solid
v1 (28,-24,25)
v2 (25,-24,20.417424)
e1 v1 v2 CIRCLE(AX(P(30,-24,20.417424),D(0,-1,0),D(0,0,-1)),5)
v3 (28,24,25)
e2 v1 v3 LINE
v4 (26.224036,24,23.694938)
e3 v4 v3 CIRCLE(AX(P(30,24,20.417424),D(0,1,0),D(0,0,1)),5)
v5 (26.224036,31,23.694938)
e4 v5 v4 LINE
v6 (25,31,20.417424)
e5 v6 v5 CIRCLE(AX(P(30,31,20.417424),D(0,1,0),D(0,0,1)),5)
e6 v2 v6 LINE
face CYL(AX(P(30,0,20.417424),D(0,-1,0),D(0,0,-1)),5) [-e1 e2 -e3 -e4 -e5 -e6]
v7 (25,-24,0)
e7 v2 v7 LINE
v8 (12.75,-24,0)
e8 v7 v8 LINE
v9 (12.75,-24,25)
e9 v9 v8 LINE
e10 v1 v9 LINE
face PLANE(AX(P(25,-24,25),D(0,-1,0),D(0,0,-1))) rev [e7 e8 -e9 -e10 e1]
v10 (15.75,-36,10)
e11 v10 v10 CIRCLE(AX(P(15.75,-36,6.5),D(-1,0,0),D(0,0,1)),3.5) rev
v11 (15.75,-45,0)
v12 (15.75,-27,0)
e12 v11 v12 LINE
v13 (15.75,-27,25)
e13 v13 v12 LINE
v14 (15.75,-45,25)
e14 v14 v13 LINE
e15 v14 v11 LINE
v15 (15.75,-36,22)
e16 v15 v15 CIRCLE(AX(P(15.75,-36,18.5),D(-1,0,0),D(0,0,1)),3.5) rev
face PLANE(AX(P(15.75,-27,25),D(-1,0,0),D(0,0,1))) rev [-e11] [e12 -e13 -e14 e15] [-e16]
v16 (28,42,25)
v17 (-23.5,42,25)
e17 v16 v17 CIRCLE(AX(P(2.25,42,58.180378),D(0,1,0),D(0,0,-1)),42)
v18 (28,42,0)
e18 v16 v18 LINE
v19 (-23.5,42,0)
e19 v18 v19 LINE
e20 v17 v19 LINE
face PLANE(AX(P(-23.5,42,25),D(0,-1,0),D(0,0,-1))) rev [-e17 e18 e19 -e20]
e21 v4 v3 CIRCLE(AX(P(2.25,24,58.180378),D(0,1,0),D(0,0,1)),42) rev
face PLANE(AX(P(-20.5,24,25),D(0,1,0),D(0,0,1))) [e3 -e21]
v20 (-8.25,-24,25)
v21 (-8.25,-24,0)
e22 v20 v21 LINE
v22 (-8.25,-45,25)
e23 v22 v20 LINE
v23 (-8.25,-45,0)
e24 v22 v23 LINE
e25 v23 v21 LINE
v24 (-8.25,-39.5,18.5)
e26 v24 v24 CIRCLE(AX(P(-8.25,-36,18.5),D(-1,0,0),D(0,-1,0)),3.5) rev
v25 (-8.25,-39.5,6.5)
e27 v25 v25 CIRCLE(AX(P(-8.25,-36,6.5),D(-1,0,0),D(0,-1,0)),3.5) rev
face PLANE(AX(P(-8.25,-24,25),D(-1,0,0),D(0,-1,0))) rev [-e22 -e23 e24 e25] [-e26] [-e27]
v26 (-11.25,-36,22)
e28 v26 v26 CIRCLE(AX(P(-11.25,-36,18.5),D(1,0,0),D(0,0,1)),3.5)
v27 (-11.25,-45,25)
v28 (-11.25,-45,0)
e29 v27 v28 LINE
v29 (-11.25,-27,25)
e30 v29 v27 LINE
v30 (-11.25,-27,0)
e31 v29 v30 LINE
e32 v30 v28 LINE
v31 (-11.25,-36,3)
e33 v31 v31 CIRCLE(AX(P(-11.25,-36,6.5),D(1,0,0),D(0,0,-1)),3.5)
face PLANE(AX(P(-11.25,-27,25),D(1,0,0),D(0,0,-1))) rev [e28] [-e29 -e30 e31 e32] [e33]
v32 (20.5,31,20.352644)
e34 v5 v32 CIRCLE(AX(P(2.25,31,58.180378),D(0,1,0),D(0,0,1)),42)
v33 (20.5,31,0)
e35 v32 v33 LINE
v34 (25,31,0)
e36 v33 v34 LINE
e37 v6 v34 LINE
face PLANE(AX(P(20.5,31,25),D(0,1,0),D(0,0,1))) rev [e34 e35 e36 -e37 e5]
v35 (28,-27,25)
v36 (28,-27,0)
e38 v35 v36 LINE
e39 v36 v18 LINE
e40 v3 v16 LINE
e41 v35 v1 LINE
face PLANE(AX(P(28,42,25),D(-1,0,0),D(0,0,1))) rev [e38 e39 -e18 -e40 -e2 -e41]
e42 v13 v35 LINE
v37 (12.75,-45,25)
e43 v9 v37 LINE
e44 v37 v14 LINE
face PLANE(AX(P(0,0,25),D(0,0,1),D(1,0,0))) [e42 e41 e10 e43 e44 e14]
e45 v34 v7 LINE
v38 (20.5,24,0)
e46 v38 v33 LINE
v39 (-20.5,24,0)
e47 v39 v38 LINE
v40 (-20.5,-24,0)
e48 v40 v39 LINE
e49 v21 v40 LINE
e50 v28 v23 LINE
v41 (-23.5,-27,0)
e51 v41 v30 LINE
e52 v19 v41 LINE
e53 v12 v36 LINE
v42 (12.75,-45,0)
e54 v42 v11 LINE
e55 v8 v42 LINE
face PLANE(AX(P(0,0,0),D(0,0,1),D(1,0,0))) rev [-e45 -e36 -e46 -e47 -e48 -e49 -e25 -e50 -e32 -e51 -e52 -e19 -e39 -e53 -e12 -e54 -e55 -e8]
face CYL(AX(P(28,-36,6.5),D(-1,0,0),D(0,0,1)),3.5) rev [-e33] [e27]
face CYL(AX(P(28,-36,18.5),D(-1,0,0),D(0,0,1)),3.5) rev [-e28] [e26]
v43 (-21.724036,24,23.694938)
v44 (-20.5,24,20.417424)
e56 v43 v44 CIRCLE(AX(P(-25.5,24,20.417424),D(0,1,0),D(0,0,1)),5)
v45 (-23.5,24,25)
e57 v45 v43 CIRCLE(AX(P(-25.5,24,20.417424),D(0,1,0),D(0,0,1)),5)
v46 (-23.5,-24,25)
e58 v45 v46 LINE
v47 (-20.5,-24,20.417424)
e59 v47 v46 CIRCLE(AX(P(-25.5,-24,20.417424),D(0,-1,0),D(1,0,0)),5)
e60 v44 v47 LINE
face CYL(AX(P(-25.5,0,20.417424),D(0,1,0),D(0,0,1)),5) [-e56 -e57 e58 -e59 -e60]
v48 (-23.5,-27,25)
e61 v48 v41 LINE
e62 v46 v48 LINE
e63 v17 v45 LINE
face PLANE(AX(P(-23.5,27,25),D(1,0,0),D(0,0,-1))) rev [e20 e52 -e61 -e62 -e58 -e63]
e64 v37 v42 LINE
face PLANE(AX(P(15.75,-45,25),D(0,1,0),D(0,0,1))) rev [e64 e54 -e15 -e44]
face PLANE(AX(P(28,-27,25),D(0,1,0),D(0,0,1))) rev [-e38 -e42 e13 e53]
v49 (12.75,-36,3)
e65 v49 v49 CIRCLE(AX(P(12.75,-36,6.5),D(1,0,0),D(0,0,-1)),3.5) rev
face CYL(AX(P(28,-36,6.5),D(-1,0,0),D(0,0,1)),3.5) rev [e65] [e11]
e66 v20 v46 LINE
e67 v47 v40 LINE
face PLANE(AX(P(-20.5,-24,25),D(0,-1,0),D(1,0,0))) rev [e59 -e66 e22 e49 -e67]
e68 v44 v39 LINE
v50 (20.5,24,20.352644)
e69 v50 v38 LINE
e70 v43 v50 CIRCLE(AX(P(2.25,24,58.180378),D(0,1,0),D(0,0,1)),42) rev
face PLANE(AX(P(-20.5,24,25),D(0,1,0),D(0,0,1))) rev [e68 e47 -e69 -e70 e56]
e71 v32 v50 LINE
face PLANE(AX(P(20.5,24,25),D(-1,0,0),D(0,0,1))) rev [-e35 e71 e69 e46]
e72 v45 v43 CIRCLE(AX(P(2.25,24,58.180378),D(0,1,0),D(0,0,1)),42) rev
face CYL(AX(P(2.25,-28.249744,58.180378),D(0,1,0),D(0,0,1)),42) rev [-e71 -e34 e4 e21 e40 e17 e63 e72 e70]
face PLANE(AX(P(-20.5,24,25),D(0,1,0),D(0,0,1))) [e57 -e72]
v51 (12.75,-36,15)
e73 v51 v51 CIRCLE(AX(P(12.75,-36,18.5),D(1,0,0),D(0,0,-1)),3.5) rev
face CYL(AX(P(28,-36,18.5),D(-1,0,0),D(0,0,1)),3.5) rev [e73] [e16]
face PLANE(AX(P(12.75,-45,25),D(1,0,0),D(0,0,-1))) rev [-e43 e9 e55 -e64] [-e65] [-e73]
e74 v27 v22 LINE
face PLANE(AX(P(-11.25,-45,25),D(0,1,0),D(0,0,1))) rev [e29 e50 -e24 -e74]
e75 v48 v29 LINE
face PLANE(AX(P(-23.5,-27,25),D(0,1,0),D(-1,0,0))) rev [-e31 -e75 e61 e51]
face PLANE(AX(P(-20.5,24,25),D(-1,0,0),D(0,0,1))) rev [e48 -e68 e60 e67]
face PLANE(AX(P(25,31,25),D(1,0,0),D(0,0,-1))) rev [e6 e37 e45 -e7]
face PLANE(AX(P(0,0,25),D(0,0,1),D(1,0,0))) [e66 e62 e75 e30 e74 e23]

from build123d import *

# Parameters (mm, degrees)
BOSS_EXTRUDE1_DEPTH = 25
SKETCH2_R           = 3.5
CUT_EXTRUDE1_DEPTH  = 65.734554142
CUT_EXTRUDE3_REACH  = 96.752
FILLET1_R           = 5


with BuildPart() as part:
    # Sketch1 → Boss-Extrude1 (new body)
    with BuildSketch(Plane.XY):
        Polygon((-20.5, 24), (20.5, 24), (20.5, 31), (25, 31), (25, -24), (12.75, -24), (12.75, -45), (15.75, -45), (15.75, -27), (28, -27), (28, 34), (28, 42), (-23.5, 42), (-23.5, 27), (-23.5, -27), (-11.25, -27), (-11.25, -45), (-8.25, -45), (-8.25, -24), (-20.5, -24), align=None)
    extrude(amount=BOSS_EXTRUDE1_DEPTH)

    # Sketch2 → Cut-Extrude1 (cut, through all)
    with BuildSketch(Plane(origin=(-11.25, 0, 0), x_dir=(0, 0, -1), z_dir=(1, 0, 0))):
        with Locations(Location((-6.5, -36, 0), (0, 0, 270))):
            Circle(SKETCH2_R)
        with Locations(Location((-18.5, -36, 0), (0, 0, 180))):
            Circle(SKETCH2_R)
    extrude(amount=CUT_EXTRUDE1_DEPTH, mode=Mode.SUBTRACT)

    # Cut-Extrude3: up to this face of the body (flat: up to its plane)
    cut_extrude3_end = Plane(part.part.faces().sort_by_distance((0, 24, 12.5))[0])
    # Sketch4 → Cut-Extrude3 (cut, up to the picked face)
    with BuildSketch(Plane(origin=(0, 42, 0), x_dir=(1, 0, 0), z_dir=(0, 1, 0)), mode=Mode.PRIVATE) as cut_extrude3_sk1:
        with BuildLine():
            Line((28, -25), (-23.5, -25))
            ThreePointArc((-23.5, -25), (2.25, -16.180378238), (28, -25))
        make_face()
    cut_extrude3_tool1 = split(extrude(cut_extrude3_sk1.sketch, amount=-CUT_EXTRUDE3_REACH, mode=Mode.PRIVATE), bisect_by=cut_extrude3_end, keep=Keep.BOTH, mode=Mode.PRIVATE)
    add(cut_extrude3_tool1.solids().sort_by(Axis((2.25, 42, 21.438341), (0, -1, 0)))[0], mode=Mode.SUBTRACT)

    # Fillet1
    # the kernel refuses this fillet: 5 mm, written as the material it takes off along each edge
    with BuildSketch(Plane(origin=(25, 35.456439237, 25), x_dir=(0, 0, -1), z_dir=(0, -1, 0))) as fillet1_piece_1_section:
        with BuildLine():
            CenterArc((4.582575695, 5), FILLET1_R, 203.578178478, 66.421821522)
            Line((0, 3), (0, 0))
            Line((0, 0), (4.582575695, 0))
        make_face()
    fillet1_piece_1 = extrude(amount=59.456439237, mode=Mode.PRIVATE)
    fillet1_piece_1 = split(fillet1_piece_1, bisect_by=Plane(origin=(25.306626157, 31, 22.170234041), z_dir=(0, -1, 0)), keep=Keep.TOP, mode=Mode.PRIVATE)
    add(fillet1_piece_1, mode=Mode.SUBTRACT)
    with BuildSketch(Plane(origin=(-20.5, -24, 25), x_dir=(0, 0, -1), z_dir=(0, 1, 0))) as fillet1_piece_2:
        with BuildLine():
            CenterArc((4.582575695, 5), FILLET1_R, 203.578178478, 66.421821522)
            Line((0, 3), (0, 0))
            Line((0, 0), (4.582575695, 0))
        make_face()
    extrude(amount=48, mode=Mode.SUBTRACT)


solid = part.part
